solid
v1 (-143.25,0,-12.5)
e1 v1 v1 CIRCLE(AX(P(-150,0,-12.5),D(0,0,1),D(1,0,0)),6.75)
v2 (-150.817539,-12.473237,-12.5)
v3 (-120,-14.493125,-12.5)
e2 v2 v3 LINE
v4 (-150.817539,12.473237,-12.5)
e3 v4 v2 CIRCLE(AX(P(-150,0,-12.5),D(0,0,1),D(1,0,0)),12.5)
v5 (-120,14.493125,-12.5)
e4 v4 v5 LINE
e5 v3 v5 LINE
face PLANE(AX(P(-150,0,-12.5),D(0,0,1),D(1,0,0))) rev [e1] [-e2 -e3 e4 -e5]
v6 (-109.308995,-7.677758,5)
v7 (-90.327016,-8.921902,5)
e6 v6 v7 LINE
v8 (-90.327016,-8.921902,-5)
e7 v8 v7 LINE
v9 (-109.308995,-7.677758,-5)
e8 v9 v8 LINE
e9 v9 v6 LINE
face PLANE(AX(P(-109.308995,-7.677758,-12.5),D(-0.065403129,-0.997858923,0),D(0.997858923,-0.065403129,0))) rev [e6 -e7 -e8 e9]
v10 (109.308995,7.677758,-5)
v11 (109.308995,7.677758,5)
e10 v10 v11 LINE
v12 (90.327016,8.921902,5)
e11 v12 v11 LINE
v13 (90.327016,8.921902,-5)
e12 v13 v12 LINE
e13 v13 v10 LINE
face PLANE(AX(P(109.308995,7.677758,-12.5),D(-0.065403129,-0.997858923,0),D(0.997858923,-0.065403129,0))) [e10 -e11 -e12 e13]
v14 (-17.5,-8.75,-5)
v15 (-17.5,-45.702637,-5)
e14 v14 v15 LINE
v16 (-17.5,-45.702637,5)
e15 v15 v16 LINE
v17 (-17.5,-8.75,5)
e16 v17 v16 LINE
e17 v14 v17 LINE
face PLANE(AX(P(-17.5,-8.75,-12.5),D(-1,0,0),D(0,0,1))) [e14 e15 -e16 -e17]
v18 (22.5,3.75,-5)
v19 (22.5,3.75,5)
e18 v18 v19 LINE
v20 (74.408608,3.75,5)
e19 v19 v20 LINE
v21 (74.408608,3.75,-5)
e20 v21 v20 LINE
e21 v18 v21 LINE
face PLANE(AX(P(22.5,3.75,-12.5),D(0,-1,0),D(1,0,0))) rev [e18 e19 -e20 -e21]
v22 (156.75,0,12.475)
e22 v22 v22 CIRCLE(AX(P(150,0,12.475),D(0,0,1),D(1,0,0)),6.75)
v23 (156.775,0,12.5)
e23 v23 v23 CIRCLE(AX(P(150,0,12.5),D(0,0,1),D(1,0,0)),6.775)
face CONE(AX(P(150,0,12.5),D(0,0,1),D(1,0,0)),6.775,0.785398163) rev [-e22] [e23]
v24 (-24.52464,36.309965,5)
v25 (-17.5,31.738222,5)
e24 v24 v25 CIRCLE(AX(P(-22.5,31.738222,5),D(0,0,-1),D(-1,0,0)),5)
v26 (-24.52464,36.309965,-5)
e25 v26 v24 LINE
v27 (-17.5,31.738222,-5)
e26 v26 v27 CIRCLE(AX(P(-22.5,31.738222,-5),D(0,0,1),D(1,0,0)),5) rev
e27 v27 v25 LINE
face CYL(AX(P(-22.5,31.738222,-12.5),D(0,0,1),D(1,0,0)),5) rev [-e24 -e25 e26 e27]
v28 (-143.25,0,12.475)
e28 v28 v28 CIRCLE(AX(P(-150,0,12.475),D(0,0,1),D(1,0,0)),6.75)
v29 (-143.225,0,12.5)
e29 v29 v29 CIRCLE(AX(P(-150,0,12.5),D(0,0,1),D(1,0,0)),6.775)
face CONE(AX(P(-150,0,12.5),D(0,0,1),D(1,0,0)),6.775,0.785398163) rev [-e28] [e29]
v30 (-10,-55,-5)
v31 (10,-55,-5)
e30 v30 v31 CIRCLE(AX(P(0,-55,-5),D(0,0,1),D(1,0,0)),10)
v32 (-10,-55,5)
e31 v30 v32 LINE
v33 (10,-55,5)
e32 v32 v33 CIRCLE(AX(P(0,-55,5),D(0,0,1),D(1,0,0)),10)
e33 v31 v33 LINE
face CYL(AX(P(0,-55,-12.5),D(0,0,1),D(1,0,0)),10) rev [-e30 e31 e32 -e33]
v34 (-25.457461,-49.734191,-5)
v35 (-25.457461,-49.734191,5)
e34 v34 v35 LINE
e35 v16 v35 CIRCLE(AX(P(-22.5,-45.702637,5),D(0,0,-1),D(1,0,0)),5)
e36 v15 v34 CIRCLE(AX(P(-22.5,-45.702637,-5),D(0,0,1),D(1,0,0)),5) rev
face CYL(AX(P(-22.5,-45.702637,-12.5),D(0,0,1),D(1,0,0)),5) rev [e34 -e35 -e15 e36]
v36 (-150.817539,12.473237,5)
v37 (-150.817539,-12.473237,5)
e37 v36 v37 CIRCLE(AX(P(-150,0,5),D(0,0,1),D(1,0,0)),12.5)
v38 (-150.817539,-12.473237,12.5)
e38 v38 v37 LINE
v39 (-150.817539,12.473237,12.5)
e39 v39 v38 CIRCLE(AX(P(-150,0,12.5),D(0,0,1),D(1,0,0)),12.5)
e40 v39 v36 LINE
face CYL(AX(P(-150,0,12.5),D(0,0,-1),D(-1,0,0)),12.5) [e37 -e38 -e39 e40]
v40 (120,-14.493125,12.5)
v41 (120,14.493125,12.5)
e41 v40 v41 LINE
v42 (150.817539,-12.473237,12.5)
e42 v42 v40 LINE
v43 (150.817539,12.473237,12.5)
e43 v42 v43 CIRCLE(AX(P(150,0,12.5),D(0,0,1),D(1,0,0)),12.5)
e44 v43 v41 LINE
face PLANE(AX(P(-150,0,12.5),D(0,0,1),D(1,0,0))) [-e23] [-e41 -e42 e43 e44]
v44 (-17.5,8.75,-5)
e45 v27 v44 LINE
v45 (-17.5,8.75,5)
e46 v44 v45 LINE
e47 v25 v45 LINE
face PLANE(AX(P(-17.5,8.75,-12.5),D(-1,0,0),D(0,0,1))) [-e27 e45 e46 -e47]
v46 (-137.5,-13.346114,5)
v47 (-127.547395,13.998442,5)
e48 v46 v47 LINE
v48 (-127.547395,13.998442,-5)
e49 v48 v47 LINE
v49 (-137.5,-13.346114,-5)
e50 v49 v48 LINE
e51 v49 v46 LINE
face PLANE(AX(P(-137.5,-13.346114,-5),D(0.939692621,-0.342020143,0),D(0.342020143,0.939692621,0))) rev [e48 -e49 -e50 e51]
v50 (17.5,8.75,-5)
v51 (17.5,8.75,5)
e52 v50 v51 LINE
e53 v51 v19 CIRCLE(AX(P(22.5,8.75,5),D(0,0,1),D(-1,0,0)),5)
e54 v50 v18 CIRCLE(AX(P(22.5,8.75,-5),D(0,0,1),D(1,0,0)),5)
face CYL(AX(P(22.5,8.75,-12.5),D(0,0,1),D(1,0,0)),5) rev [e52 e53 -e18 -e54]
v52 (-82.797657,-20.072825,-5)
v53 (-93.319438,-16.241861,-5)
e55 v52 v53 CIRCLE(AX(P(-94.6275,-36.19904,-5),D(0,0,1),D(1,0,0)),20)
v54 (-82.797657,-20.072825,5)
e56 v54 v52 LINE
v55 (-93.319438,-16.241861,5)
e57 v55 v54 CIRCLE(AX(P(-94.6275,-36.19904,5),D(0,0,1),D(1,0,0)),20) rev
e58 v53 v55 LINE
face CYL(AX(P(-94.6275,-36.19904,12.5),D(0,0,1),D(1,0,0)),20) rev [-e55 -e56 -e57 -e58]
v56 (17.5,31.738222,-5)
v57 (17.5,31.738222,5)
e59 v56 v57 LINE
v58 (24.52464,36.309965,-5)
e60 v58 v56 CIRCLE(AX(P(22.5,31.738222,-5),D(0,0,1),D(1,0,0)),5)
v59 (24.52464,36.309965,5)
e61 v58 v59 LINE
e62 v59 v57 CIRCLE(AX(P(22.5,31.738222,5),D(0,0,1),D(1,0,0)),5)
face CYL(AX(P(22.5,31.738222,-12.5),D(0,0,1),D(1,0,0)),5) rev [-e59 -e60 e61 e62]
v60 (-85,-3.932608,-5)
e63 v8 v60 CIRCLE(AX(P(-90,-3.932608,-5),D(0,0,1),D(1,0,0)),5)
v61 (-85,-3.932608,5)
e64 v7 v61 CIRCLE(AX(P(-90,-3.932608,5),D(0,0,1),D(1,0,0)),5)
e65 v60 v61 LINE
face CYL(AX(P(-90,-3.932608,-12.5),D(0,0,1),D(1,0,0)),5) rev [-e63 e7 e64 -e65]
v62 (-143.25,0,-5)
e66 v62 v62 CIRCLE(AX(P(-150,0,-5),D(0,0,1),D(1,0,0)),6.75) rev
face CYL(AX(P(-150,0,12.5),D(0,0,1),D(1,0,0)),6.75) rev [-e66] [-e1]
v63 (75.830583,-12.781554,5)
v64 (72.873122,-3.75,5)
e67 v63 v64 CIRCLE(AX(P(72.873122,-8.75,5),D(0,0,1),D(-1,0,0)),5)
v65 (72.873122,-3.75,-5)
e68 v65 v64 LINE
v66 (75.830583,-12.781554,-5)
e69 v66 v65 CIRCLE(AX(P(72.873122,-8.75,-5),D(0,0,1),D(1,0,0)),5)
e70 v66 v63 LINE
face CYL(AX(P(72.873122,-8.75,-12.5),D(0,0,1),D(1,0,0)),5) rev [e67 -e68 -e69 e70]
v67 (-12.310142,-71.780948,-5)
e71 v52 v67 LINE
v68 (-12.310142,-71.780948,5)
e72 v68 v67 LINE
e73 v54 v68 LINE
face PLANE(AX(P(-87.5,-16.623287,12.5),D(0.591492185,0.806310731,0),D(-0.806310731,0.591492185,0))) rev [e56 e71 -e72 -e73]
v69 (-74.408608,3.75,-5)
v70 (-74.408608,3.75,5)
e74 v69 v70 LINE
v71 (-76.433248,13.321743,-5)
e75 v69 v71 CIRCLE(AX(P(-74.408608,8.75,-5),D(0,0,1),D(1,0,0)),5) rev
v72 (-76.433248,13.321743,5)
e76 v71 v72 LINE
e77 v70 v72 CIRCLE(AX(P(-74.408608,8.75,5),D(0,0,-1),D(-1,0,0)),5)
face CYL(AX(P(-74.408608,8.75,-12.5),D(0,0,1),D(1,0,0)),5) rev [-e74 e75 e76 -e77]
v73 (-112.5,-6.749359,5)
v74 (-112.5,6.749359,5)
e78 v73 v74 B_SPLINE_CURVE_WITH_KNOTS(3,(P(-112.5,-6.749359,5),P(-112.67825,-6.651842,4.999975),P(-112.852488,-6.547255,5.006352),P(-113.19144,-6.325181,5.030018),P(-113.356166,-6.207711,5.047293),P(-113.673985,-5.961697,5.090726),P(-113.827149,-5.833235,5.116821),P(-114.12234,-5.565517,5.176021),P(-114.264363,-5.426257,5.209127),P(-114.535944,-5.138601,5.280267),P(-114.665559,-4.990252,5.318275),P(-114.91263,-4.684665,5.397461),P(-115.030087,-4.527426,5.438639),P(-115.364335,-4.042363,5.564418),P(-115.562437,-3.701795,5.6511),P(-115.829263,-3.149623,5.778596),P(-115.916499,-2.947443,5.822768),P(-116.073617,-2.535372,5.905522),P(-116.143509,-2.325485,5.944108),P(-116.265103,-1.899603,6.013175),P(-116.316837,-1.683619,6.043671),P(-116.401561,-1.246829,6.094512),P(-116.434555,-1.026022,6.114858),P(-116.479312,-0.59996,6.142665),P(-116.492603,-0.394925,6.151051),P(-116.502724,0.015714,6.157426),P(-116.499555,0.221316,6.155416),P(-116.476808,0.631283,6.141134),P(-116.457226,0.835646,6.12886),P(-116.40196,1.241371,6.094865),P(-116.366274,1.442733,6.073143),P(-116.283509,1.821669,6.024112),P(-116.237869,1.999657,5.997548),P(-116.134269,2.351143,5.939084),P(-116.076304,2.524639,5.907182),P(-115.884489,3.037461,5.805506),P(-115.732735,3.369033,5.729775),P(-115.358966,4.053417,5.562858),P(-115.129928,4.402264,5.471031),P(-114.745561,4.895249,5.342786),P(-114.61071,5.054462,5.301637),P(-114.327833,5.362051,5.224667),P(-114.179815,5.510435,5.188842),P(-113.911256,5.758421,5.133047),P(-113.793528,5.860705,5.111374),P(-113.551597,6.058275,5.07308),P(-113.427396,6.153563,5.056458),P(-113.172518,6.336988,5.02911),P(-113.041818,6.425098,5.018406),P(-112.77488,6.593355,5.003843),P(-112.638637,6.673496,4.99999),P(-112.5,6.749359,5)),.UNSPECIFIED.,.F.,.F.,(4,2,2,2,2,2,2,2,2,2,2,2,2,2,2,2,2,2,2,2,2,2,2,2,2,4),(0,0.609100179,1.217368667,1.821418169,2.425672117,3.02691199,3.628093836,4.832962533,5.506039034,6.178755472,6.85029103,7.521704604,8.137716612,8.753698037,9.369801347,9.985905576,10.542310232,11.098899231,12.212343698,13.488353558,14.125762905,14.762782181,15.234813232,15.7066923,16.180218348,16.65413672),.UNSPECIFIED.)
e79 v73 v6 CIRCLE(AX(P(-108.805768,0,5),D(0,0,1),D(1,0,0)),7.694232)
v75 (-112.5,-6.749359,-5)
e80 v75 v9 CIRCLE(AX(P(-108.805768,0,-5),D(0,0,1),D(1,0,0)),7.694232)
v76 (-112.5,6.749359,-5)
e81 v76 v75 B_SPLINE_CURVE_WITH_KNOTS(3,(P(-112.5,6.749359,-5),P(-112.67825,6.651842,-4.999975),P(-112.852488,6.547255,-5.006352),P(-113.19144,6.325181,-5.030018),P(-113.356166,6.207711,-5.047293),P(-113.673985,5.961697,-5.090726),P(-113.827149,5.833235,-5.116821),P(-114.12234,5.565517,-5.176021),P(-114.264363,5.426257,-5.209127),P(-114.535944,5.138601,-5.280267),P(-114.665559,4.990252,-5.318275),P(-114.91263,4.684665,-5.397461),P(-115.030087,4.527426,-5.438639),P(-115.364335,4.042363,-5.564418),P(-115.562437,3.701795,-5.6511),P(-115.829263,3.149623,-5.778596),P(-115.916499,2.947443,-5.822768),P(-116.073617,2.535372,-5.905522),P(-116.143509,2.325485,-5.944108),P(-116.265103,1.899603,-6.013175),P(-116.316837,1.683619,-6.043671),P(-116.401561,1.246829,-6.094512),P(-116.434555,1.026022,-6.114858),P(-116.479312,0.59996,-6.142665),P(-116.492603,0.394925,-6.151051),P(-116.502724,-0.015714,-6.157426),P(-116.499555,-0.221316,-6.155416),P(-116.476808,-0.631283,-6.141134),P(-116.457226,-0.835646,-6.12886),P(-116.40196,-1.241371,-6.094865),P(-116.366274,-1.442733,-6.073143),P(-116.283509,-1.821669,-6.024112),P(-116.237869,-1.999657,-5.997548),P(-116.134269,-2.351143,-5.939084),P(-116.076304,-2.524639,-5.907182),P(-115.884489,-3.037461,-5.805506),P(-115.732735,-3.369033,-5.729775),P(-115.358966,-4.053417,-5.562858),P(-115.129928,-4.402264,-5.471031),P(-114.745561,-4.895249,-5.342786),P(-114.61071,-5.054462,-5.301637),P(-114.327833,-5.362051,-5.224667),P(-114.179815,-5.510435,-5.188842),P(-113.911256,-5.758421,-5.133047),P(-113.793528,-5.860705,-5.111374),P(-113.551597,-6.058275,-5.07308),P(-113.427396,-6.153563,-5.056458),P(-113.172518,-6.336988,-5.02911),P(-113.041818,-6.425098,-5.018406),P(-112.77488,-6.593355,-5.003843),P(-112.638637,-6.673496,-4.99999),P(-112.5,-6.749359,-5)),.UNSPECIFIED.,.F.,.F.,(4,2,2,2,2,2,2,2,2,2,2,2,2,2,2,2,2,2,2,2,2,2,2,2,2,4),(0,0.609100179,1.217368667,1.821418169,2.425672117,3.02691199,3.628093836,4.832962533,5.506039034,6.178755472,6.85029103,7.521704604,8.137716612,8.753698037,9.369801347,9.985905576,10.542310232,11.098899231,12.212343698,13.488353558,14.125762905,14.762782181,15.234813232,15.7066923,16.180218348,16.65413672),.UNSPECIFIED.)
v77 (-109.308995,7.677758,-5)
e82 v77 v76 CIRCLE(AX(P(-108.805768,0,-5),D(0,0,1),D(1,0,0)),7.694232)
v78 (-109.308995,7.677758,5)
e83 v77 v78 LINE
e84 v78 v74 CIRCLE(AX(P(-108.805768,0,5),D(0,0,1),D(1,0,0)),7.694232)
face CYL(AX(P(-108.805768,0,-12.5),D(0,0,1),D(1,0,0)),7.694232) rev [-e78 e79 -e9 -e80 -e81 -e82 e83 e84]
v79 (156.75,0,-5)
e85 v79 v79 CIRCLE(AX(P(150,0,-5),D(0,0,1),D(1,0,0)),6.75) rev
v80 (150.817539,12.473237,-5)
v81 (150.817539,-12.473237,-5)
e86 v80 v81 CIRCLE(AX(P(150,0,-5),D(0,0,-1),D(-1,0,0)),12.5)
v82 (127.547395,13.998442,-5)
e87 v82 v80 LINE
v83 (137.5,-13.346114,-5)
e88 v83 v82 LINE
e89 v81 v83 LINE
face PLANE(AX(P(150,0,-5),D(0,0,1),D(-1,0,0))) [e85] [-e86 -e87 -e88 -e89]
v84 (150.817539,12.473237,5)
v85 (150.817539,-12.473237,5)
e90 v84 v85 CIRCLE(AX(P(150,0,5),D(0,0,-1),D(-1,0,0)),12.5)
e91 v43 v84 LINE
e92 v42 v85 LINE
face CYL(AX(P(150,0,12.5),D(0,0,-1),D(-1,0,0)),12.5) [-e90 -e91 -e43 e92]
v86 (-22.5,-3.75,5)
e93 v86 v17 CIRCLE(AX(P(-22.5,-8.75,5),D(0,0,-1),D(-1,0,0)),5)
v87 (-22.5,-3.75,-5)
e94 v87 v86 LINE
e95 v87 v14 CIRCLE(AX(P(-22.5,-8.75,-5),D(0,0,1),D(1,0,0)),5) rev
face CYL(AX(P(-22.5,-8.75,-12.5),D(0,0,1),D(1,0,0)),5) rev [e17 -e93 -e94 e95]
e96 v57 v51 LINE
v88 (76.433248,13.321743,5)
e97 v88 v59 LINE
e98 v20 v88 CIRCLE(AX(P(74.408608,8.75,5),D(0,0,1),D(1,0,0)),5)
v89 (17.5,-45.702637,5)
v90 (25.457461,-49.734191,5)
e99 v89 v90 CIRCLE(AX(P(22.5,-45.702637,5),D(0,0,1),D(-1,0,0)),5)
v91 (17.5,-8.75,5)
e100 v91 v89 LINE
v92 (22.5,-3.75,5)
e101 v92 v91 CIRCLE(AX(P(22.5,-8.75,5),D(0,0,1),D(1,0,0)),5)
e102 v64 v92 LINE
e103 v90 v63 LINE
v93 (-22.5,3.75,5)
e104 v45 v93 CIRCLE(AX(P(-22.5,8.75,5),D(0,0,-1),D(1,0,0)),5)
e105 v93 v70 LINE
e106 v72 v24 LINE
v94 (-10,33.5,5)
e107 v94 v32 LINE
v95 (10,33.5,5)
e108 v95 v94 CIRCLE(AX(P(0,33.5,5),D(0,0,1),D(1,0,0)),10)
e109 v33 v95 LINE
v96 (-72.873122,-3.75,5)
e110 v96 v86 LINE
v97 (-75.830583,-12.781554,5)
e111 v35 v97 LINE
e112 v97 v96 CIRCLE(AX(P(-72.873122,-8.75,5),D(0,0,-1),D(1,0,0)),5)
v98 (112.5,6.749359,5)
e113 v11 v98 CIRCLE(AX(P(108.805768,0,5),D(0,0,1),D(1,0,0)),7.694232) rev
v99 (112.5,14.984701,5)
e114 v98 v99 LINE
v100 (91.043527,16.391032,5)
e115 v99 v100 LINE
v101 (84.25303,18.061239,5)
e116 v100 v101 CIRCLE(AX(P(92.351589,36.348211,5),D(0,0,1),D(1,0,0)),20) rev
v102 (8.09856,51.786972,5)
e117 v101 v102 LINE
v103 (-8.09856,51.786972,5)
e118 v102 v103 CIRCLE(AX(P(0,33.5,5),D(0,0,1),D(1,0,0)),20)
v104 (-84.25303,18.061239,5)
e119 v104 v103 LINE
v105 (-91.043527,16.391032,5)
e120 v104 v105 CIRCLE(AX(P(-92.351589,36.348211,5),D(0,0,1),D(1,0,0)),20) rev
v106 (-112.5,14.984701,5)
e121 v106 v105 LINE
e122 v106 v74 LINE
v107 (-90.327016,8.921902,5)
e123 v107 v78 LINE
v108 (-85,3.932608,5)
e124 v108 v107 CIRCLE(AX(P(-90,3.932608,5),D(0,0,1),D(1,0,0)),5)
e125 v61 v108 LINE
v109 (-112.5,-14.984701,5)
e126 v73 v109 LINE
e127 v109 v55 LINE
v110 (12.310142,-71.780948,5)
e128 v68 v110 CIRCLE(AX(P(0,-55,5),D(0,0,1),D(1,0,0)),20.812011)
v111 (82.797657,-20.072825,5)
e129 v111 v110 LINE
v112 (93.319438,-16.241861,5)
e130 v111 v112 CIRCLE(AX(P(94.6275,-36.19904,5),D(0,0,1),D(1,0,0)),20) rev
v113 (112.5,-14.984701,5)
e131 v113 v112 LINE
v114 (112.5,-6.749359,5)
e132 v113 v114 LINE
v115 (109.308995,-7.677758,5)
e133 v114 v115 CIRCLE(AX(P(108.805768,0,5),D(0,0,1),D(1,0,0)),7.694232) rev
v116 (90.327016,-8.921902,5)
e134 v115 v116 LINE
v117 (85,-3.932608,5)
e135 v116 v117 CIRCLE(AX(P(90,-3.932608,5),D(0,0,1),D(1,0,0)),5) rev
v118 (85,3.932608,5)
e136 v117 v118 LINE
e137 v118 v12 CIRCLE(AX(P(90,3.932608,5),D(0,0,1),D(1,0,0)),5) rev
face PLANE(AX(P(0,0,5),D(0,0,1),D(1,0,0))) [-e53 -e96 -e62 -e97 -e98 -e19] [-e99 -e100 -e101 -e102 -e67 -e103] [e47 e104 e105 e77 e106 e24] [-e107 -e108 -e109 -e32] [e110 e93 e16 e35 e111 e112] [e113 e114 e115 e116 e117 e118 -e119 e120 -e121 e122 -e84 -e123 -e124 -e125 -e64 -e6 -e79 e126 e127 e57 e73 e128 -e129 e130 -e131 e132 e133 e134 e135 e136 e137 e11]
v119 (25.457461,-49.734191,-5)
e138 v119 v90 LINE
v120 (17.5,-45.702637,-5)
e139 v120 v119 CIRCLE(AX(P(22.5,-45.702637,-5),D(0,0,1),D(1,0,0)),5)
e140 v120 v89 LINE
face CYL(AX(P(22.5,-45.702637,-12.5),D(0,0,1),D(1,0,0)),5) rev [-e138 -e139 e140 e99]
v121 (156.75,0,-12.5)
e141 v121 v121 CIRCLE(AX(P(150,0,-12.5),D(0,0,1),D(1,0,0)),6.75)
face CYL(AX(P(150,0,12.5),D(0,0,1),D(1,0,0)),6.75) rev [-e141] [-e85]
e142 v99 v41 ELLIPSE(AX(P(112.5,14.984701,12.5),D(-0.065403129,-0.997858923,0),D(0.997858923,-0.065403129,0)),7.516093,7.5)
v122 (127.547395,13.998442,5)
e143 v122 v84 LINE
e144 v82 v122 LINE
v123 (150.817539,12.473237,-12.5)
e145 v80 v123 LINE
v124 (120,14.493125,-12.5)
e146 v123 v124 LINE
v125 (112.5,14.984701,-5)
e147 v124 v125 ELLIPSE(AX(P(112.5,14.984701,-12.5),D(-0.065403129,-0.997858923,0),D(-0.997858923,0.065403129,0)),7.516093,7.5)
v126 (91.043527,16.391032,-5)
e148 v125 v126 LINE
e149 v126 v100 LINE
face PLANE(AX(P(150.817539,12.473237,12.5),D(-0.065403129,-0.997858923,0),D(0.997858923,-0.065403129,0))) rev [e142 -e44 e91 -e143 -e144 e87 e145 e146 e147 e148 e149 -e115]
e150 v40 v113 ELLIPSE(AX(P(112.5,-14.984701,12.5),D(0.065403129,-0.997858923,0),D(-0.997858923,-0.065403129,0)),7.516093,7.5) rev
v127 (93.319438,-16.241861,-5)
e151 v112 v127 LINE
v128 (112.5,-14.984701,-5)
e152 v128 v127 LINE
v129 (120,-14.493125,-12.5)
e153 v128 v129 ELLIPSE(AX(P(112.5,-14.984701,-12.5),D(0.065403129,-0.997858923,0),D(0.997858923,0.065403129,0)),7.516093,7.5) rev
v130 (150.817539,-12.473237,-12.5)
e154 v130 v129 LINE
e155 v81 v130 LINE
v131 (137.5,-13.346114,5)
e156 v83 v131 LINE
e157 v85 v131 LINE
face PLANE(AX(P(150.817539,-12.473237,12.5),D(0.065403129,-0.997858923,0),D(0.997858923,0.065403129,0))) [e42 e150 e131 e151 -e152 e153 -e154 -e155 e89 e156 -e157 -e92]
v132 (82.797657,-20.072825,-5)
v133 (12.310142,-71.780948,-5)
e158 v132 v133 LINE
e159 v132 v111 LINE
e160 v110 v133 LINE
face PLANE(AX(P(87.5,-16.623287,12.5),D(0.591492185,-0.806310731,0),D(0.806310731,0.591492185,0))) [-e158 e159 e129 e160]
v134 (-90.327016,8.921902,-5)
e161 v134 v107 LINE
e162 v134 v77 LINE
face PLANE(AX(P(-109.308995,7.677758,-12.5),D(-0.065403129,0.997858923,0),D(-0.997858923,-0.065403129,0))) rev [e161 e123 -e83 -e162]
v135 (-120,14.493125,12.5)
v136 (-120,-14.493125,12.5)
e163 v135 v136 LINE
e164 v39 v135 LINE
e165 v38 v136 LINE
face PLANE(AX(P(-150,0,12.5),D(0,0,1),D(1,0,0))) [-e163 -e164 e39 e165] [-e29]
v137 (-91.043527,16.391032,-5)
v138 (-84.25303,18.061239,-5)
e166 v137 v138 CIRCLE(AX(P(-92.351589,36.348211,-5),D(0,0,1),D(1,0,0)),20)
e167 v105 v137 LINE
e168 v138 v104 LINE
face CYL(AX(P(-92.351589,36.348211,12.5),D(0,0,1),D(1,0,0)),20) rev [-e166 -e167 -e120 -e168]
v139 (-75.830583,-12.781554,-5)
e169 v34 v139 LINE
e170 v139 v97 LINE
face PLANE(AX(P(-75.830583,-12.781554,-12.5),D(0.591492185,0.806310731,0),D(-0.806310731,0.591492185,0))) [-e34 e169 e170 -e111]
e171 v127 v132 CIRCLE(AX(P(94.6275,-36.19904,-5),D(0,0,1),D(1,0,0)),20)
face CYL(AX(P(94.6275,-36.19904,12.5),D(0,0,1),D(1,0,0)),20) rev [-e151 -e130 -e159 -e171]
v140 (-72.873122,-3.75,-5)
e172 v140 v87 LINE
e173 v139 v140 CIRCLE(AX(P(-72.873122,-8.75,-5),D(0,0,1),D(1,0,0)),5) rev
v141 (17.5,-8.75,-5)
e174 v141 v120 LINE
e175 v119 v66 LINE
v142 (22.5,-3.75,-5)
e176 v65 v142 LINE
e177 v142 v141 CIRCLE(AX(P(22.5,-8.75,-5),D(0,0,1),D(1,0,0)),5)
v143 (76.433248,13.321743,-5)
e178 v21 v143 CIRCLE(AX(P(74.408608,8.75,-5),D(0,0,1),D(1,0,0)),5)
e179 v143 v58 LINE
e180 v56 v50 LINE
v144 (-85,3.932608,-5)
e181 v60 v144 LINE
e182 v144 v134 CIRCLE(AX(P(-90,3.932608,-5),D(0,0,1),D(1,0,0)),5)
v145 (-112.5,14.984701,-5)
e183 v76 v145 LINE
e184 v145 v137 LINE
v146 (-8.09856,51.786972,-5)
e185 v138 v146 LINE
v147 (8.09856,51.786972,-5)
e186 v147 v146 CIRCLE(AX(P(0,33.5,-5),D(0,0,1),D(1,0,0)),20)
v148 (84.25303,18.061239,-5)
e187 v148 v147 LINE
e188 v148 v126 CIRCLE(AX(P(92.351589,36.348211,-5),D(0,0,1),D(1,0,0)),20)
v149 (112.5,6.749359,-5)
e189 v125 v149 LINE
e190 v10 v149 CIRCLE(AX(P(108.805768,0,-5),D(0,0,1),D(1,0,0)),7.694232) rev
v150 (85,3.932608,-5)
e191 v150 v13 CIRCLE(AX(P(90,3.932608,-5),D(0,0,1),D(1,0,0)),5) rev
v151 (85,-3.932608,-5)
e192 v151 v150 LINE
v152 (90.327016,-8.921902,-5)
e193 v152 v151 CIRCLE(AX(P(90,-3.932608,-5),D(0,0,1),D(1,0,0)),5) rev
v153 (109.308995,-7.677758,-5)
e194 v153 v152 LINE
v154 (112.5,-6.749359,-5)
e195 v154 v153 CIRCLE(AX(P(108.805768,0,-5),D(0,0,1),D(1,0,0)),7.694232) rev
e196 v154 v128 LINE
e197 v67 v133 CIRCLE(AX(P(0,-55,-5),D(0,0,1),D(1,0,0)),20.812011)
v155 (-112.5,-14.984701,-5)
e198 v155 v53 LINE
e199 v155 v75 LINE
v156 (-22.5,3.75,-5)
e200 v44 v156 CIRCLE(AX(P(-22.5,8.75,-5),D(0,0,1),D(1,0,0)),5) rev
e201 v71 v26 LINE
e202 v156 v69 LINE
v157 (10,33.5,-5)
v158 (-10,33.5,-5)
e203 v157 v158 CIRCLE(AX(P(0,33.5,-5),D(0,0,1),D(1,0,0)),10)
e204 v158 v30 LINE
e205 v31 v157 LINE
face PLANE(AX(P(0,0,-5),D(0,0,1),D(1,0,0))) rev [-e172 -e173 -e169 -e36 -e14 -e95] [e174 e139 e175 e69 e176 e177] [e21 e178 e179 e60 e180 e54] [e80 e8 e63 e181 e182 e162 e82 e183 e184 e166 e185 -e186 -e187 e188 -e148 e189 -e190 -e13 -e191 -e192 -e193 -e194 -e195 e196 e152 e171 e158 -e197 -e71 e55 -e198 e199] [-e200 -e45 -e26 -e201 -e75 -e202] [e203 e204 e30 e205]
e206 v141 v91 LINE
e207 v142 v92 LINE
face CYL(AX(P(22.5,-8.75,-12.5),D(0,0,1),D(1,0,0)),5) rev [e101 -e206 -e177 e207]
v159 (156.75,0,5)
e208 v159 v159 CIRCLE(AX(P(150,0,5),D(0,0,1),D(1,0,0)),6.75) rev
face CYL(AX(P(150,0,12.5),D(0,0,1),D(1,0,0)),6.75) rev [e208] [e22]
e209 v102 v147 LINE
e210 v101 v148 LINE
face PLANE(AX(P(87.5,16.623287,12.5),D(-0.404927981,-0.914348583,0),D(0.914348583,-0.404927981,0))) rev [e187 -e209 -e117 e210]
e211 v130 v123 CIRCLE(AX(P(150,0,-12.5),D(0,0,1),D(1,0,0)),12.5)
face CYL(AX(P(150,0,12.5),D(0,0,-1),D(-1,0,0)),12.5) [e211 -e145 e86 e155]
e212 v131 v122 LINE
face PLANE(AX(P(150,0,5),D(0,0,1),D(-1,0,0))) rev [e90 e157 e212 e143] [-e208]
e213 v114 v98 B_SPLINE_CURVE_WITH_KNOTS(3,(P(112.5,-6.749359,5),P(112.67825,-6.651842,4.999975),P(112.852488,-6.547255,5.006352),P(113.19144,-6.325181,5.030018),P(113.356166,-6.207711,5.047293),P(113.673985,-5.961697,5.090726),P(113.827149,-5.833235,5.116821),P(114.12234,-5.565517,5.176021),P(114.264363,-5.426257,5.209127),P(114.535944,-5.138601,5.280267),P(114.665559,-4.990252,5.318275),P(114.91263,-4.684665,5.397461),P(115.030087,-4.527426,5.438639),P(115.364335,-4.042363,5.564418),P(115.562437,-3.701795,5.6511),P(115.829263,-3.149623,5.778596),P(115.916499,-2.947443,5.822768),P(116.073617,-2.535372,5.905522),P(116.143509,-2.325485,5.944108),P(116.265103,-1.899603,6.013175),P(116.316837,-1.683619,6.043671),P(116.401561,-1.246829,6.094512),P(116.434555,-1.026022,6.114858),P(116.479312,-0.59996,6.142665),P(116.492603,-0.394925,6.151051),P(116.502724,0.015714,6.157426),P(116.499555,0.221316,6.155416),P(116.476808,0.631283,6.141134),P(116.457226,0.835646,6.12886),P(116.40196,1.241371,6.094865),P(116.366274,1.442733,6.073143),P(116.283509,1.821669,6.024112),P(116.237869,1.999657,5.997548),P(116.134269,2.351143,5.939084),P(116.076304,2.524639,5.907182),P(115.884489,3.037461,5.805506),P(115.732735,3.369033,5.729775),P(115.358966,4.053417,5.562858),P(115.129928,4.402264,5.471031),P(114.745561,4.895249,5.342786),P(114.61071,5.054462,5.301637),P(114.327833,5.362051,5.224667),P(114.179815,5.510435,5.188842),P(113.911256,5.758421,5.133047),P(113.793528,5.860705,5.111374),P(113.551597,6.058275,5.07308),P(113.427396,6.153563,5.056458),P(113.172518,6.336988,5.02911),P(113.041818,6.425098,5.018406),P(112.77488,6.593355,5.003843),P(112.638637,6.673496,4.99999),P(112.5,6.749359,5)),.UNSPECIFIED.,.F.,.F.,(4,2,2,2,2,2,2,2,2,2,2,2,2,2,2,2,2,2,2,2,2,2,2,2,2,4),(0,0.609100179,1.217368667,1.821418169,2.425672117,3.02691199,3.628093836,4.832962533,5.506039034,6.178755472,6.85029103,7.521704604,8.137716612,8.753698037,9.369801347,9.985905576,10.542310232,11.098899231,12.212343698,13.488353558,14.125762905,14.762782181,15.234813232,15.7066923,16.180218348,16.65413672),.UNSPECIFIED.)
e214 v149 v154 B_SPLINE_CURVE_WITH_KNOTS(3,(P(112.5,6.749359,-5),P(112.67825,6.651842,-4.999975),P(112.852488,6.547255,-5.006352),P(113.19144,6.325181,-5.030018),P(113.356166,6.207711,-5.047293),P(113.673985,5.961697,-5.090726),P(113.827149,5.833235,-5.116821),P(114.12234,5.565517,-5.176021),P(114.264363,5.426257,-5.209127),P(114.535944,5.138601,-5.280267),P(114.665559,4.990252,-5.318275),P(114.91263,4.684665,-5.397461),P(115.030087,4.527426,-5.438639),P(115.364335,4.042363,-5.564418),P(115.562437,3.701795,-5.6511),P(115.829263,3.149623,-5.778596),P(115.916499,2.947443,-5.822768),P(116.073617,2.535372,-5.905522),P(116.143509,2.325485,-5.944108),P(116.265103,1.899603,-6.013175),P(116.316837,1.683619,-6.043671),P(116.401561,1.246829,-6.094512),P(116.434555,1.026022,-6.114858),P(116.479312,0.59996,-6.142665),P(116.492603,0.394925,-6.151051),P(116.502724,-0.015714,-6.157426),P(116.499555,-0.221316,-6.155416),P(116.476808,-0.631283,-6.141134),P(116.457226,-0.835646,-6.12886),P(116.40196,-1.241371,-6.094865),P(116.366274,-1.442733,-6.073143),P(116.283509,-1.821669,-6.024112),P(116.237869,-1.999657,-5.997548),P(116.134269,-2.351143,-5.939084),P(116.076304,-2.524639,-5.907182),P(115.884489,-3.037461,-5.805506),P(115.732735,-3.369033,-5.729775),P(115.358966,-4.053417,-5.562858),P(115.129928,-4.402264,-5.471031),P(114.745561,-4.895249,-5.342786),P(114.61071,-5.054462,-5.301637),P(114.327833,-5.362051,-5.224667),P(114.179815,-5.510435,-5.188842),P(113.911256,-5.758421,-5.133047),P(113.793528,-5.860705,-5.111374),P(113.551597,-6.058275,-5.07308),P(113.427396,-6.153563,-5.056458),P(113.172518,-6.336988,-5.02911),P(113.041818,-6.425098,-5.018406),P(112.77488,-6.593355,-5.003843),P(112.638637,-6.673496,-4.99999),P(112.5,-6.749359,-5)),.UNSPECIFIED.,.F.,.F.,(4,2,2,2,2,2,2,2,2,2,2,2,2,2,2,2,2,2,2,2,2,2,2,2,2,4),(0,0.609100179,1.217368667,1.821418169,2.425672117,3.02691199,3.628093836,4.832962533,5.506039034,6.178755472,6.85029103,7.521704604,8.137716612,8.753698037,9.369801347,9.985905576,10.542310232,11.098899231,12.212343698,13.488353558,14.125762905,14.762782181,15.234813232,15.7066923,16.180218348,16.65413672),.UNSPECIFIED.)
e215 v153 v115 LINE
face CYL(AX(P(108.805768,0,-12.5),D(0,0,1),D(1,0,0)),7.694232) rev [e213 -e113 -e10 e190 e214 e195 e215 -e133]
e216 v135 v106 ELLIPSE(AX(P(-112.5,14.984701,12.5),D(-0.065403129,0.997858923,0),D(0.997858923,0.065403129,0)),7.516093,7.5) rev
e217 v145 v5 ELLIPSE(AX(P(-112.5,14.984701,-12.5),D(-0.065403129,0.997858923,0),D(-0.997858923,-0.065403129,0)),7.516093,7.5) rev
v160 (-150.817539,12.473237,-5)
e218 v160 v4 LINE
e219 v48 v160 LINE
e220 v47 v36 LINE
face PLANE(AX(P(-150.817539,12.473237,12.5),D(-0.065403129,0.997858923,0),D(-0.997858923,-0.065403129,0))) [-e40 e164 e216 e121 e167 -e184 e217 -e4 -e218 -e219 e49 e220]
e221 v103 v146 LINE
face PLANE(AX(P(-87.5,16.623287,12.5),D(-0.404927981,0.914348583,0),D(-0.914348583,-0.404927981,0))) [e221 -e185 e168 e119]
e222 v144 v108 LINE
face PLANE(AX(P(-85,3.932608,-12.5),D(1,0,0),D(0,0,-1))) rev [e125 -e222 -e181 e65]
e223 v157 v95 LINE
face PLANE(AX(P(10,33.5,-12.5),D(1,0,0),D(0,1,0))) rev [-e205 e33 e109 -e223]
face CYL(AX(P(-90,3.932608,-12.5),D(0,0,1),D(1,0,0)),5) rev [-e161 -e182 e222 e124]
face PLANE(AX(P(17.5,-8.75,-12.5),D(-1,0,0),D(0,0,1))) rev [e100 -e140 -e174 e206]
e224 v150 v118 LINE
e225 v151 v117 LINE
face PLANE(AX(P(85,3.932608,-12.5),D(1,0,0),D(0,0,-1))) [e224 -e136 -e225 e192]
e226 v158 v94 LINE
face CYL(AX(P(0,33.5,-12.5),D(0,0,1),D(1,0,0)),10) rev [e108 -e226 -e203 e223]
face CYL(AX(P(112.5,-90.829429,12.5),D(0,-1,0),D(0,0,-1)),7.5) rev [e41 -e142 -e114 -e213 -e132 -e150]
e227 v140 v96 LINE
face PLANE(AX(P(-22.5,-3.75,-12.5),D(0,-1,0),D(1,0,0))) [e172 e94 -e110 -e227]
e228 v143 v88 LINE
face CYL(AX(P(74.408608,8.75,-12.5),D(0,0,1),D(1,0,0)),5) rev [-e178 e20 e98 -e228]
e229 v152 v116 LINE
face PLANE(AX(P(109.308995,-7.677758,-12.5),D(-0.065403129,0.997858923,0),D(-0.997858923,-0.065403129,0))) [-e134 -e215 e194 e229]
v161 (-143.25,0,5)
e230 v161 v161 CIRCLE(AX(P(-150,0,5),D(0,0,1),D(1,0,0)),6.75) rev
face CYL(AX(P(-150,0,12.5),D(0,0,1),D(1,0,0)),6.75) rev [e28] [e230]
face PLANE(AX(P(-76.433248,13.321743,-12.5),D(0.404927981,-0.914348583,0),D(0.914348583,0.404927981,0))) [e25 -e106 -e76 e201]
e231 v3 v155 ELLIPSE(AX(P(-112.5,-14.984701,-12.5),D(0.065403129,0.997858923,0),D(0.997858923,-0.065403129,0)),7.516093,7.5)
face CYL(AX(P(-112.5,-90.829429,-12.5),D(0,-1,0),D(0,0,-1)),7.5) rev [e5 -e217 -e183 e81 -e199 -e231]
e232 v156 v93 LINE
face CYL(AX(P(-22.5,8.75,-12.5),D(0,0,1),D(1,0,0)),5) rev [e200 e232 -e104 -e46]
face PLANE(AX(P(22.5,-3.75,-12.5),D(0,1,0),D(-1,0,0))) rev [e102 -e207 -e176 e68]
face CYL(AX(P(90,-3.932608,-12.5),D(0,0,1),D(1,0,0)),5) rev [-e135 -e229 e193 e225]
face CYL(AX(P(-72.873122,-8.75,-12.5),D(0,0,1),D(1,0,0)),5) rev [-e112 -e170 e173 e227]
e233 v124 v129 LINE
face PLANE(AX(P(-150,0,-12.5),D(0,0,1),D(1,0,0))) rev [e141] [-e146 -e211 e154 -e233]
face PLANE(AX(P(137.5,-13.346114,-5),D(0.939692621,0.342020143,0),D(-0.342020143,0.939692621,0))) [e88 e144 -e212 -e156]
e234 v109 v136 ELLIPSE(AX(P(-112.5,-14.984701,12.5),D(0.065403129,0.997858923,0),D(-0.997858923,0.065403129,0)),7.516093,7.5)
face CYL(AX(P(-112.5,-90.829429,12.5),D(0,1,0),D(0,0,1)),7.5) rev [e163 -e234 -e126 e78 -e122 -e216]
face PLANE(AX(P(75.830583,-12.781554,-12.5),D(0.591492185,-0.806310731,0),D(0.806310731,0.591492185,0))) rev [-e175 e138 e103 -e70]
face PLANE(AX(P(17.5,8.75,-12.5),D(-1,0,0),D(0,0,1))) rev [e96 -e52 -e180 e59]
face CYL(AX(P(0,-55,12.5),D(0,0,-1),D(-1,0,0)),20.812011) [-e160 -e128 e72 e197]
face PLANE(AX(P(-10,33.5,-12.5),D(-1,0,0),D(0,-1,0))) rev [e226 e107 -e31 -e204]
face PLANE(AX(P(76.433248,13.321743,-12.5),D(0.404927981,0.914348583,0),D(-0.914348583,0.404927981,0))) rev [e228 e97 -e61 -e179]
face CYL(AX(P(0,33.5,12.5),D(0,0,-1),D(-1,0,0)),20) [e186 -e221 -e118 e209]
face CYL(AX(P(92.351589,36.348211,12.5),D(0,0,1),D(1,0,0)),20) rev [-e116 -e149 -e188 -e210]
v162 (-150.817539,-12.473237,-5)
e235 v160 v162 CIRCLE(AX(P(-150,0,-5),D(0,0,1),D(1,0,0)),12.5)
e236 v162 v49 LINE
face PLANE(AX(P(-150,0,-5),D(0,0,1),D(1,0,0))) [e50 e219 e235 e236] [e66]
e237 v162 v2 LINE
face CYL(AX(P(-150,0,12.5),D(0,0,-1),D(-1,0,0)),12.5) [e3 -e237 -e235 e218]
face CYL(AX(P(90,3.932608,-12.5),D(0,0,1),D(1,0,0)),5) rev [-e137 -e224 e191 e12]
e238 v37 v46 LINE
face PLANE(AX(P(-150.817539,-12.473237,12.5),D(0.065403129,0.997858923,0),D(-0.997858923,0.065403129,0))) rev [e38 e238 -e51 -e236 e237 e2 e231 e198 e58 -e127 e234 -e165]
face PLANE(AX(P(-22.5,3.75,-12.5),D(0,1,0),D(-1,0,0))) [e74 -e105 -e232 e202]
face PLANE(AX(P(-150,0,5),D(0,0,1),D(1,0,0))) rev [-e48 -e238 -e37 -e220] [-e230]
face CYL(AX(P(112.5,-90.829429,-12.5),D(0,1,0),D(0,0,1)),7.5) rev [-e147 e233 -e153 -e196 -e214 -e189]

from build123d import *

# Parameters (mm, degrees)
BOSS_EXTRUDE1_DEPTH                    = 12.5
SKETCH2_W                              = 240
SKETCH2_H                              = 181.658858688
CUT_EXTRUDE1_DEPTH                     = 7.5
F_13_5_13_5_DIAMETER_HOLE1_D           = 13.5
F_13_5_13_5_DIAMETER_HOLE1_CSINK_D     = 13.55
F_13_5_13_5_DIAMETER_HOLE1_CSINK_ANGLE = 90
CUT_EXTRUDE2_DEPTH                     = 5
FILLET1_R                              = 7.5
FILLET2_R                              = 20
CUT_EXTRUDE3_DEPTH                     = 181.166481325
CUT_EXTRUDE4_DEPTH                     = 181.166481325
CUT_EXTRUDE5_DEPTH                     = 181.166481325


with BuildPart() as part:
    # Sketch1 → Boss-Extrude1 (new, symmetric)
    with BuildSketch(Plane.XY):
        with BuildLine():
            Line((-150.817539115, 12.47323654), (-87.5, 16.623287311))
            Line((-87.5, 16.623287311), (-8.098559617, 51.78697165))
            ThreePointArc((-8.098559617, 51.78697165), (0, 53.5), (8.098559617, 51.78697165))
            Line((8.098559617, 51.78697165), (87.5, 16.623287311))
            Line((87.5, 16.623287311), (150.817539115, 12.47323654))
            ThreePointArc((150.817539115, 12.47323654), (162.5, 0), (150.817539115, -12.47323654))
            Line((150.817539115, -12.47323654), (87.5, -16.623287311))
            Line((87.5, -16.623287311), (12.310141778, -71.78094771))
            ThreePointArc((12.310141778, -71.78094771), (0, -75.812010875), (-12.310141778, -71.78094771))
            Line((-12.310141778, -71.78094771), (-87.5, -16.623287311))
            Line((-87.5, -16.623287311), (-150.817539115, -12.47323654))
            ThreePointArc((-150.817539115, -12.47323654), (-162.5, 0), (-150.817539115, 12.47323654))
        make_face()
    extrude(amount=BOSS_EXTRUDE1_DEPTH, both=True)

    # Sketch2 → Cut-Extrude1 (cut)
    with BuildSketch(Plane.XY.offset(12.5)):
        Rectangle(SKETCH2_W, SKETCH2_H)
    cut_extrude1 = extrude(amount=-CUT_EXTRUDE1_DEPTH, mode=Mode.SUBTRACT)

    # Mirror2: Cut-Extrude1 across plane
    add(cut_extrude1.mirror(Plane.XY), mode=Mode.SUBTRACT)

    # Ø13.5 (13.5) Diameter Hole1 (through all)
    with Locations(Plane.XY.offset(12.5)):
        with Locations((-150, 0), (150, 0)):
            CounterSinkHole(F_13_5_13_5_DIAMETER_HOLE1_D / 2, F_13_5_13_5_DIAMETER_HOLE1_CSINK_D / 2, counter_sink_angle=F_13_5_13_5_DIAMETER_HOLE1_CSINK_ANGLE)

    # Sketch5 → Cut-Extrude2 (cut, symmetric)
    with BuildSketch(Plane.XY):
        with BuildLine():
            Line((-137.5, -13.34611417), (-127.54739536, 13.998442342))
            Line((-127.54739536, 13.998442342), (-150.817539115, 12.47323654))
            ThreePointArc((-150.817539115, 12.47323654), (-162.5, 0), (-150.817539115, -12.47323654))
            Line((-150.817539115, -12.47323654), (-137.5, -13.34611417))
        make_face()
    cut_extrude2 = extrude(amount=CUT_EXTRUDE2_DEPTH, both=True, mode=Mode.SUBTRACT)

    # Mirror3: Cut-Extrude2 across plane
    add(cut_extrude2.mirror(Plane(origin=(0, 0, 0), x_dir=(0, 0, 1), z_dir=(1, 0, 0))), mode=Mode.SUBTRACT)

    # Fillet1
    fillet1_edges = [part.edges().sort_by_distance(p)[0] for p in [
        (120, 0, -5),
        (120, 0, 5),
        (-120, 0, -5),
        (-120, 0, 5),
    ]]
    fillet(fillet1_edges, radius=FILLET1_R - 0.0001)  # a hair under: the kernel refuses the full size

    # Fillet2
    fillet2_edges = [part.edges().sort_by_distance(p)[0] for p in [
        (-87.5, 16.623287311, 0),
        (87.5, 16.623287311, 0),
        (87.5, -16.623287311, 0),
        (-87.5, -16.623287311, 0),
    ]]
    fillet(fillet2_edges, radius=FILLET2_R)

    # Sketch6 → Cut-Extrude3 (cut, through all)
    with BuildSketch(Plane.XY.offset(5)):
        with BuildLine():
            Line((10, 33.5), (10, -55))
            ThreePointArc((10, -55), (0, -65), (-10, -55))
            Line((-10, -55), (-10, 33.5))
            ThreePointArc((-10, 33.5), (0, 43.5), (10, 33.5))
        make_face()
    extrude(amount=-CUT_EXTRUDE3_DEPTH, mode=Mode.SUBTRACT)

    # Sketch7 → Cut-Extrude4 (cut, through all)
    with BuildSketch(Plane.XY.offset(5)):
        with BuildLine():
            Line((76.433247958, 13.321742913), (24.524639904, 36.309964527))
            ThreePointArc((24.524639904, 36.309964527), (19.772656927, 35.928877859), (17.5, 31.738221615))
            Line((17.5, 31.738221615), (17.5, 8.75))
            ThreePointArc((17.5, 8.75), (18.964466094, 5.214466094), (22.5, 3.75))
            Line((22.5, 3.75), (74.408608053, 3.75))
            ThreePointArc((74.408608053, 3.75), (79.300372283, 7.715281334), (76.433247958, 13.321742913))
        make_face()
        with BuildLine():
            Line((75.830583045, -12.781553657), (25.457460923, -49.734191007))
            ThreePointArc((25.457460923, -49.734191007), (20.240277076, -50.162867423), (17.5, -45.70263735))
            Line((17.5, -45.70263735), (17.5, -8.75))
            ThreePointArc((17.5, -8.75), (18.964466094, -5.214466094), (22.5, -3.75))
            Line((22.5, -3.75), (72.873122122, -3.75))
            ThreePointArc((72.873122122, -3.75), (77.624846456, -7.194006473), (75.830583045, -12.781553657))
        make_face()
    cut_extrude4 = extrude(amount=-CUT_EXTRUDE4_DEPTH, mode=Mode.SUBTRACT)

    # Mirror4: Cut-Extrude4 across plane
    add(cut_extrude4.mirror(Plane(origin=(0, 0, 0), x_dir=(0, 0, 1), z_dir=(1, 0, 0))), mode=Mode.SUBTRACT)

    # Sketch8 → Cut-Extrude5 (cut, symmetric)
    with BuildSketch(Plane.XY.offset(5)):
        with BuildLine():
            Line((-109.308995171, 7.677757716), (-90.327015646, 8.921902385))
            ThreePointArc((-90.327015646, 8.921902385), (-86.58203849, 7.581928132), (-85, 3.932607769))
            Line((-85, 3.932607769), (-85, -3.932607769))
            ThreePointArc((-85, -3.932607769), (-86.58203849, -7.581928132), (-90.327015646, -8.921902385))
            Line((-90.327015646, -8.921902385), (-109.308995171, -7.677757716))
            ThreePointArc((-109.308995171, -7.677757716), (-116.5, 0), (-109.308995171, 7.677757716))
        make_face()
    cut_extrude5 = extrude(amount=CUT_EXTRUDE5_DEPTH, both=True, mode=Mode.SUBTRACT)

    # Mirror5: Cut-Extrude5 across plane
    add(cut_extrude5.mirror(Plane(origin=(0, 0, 0), x_dir=(0, 0, 1), z_dir=(1, 0, 0))), mode=Mode.SUBTRACT)


solid = part.part
